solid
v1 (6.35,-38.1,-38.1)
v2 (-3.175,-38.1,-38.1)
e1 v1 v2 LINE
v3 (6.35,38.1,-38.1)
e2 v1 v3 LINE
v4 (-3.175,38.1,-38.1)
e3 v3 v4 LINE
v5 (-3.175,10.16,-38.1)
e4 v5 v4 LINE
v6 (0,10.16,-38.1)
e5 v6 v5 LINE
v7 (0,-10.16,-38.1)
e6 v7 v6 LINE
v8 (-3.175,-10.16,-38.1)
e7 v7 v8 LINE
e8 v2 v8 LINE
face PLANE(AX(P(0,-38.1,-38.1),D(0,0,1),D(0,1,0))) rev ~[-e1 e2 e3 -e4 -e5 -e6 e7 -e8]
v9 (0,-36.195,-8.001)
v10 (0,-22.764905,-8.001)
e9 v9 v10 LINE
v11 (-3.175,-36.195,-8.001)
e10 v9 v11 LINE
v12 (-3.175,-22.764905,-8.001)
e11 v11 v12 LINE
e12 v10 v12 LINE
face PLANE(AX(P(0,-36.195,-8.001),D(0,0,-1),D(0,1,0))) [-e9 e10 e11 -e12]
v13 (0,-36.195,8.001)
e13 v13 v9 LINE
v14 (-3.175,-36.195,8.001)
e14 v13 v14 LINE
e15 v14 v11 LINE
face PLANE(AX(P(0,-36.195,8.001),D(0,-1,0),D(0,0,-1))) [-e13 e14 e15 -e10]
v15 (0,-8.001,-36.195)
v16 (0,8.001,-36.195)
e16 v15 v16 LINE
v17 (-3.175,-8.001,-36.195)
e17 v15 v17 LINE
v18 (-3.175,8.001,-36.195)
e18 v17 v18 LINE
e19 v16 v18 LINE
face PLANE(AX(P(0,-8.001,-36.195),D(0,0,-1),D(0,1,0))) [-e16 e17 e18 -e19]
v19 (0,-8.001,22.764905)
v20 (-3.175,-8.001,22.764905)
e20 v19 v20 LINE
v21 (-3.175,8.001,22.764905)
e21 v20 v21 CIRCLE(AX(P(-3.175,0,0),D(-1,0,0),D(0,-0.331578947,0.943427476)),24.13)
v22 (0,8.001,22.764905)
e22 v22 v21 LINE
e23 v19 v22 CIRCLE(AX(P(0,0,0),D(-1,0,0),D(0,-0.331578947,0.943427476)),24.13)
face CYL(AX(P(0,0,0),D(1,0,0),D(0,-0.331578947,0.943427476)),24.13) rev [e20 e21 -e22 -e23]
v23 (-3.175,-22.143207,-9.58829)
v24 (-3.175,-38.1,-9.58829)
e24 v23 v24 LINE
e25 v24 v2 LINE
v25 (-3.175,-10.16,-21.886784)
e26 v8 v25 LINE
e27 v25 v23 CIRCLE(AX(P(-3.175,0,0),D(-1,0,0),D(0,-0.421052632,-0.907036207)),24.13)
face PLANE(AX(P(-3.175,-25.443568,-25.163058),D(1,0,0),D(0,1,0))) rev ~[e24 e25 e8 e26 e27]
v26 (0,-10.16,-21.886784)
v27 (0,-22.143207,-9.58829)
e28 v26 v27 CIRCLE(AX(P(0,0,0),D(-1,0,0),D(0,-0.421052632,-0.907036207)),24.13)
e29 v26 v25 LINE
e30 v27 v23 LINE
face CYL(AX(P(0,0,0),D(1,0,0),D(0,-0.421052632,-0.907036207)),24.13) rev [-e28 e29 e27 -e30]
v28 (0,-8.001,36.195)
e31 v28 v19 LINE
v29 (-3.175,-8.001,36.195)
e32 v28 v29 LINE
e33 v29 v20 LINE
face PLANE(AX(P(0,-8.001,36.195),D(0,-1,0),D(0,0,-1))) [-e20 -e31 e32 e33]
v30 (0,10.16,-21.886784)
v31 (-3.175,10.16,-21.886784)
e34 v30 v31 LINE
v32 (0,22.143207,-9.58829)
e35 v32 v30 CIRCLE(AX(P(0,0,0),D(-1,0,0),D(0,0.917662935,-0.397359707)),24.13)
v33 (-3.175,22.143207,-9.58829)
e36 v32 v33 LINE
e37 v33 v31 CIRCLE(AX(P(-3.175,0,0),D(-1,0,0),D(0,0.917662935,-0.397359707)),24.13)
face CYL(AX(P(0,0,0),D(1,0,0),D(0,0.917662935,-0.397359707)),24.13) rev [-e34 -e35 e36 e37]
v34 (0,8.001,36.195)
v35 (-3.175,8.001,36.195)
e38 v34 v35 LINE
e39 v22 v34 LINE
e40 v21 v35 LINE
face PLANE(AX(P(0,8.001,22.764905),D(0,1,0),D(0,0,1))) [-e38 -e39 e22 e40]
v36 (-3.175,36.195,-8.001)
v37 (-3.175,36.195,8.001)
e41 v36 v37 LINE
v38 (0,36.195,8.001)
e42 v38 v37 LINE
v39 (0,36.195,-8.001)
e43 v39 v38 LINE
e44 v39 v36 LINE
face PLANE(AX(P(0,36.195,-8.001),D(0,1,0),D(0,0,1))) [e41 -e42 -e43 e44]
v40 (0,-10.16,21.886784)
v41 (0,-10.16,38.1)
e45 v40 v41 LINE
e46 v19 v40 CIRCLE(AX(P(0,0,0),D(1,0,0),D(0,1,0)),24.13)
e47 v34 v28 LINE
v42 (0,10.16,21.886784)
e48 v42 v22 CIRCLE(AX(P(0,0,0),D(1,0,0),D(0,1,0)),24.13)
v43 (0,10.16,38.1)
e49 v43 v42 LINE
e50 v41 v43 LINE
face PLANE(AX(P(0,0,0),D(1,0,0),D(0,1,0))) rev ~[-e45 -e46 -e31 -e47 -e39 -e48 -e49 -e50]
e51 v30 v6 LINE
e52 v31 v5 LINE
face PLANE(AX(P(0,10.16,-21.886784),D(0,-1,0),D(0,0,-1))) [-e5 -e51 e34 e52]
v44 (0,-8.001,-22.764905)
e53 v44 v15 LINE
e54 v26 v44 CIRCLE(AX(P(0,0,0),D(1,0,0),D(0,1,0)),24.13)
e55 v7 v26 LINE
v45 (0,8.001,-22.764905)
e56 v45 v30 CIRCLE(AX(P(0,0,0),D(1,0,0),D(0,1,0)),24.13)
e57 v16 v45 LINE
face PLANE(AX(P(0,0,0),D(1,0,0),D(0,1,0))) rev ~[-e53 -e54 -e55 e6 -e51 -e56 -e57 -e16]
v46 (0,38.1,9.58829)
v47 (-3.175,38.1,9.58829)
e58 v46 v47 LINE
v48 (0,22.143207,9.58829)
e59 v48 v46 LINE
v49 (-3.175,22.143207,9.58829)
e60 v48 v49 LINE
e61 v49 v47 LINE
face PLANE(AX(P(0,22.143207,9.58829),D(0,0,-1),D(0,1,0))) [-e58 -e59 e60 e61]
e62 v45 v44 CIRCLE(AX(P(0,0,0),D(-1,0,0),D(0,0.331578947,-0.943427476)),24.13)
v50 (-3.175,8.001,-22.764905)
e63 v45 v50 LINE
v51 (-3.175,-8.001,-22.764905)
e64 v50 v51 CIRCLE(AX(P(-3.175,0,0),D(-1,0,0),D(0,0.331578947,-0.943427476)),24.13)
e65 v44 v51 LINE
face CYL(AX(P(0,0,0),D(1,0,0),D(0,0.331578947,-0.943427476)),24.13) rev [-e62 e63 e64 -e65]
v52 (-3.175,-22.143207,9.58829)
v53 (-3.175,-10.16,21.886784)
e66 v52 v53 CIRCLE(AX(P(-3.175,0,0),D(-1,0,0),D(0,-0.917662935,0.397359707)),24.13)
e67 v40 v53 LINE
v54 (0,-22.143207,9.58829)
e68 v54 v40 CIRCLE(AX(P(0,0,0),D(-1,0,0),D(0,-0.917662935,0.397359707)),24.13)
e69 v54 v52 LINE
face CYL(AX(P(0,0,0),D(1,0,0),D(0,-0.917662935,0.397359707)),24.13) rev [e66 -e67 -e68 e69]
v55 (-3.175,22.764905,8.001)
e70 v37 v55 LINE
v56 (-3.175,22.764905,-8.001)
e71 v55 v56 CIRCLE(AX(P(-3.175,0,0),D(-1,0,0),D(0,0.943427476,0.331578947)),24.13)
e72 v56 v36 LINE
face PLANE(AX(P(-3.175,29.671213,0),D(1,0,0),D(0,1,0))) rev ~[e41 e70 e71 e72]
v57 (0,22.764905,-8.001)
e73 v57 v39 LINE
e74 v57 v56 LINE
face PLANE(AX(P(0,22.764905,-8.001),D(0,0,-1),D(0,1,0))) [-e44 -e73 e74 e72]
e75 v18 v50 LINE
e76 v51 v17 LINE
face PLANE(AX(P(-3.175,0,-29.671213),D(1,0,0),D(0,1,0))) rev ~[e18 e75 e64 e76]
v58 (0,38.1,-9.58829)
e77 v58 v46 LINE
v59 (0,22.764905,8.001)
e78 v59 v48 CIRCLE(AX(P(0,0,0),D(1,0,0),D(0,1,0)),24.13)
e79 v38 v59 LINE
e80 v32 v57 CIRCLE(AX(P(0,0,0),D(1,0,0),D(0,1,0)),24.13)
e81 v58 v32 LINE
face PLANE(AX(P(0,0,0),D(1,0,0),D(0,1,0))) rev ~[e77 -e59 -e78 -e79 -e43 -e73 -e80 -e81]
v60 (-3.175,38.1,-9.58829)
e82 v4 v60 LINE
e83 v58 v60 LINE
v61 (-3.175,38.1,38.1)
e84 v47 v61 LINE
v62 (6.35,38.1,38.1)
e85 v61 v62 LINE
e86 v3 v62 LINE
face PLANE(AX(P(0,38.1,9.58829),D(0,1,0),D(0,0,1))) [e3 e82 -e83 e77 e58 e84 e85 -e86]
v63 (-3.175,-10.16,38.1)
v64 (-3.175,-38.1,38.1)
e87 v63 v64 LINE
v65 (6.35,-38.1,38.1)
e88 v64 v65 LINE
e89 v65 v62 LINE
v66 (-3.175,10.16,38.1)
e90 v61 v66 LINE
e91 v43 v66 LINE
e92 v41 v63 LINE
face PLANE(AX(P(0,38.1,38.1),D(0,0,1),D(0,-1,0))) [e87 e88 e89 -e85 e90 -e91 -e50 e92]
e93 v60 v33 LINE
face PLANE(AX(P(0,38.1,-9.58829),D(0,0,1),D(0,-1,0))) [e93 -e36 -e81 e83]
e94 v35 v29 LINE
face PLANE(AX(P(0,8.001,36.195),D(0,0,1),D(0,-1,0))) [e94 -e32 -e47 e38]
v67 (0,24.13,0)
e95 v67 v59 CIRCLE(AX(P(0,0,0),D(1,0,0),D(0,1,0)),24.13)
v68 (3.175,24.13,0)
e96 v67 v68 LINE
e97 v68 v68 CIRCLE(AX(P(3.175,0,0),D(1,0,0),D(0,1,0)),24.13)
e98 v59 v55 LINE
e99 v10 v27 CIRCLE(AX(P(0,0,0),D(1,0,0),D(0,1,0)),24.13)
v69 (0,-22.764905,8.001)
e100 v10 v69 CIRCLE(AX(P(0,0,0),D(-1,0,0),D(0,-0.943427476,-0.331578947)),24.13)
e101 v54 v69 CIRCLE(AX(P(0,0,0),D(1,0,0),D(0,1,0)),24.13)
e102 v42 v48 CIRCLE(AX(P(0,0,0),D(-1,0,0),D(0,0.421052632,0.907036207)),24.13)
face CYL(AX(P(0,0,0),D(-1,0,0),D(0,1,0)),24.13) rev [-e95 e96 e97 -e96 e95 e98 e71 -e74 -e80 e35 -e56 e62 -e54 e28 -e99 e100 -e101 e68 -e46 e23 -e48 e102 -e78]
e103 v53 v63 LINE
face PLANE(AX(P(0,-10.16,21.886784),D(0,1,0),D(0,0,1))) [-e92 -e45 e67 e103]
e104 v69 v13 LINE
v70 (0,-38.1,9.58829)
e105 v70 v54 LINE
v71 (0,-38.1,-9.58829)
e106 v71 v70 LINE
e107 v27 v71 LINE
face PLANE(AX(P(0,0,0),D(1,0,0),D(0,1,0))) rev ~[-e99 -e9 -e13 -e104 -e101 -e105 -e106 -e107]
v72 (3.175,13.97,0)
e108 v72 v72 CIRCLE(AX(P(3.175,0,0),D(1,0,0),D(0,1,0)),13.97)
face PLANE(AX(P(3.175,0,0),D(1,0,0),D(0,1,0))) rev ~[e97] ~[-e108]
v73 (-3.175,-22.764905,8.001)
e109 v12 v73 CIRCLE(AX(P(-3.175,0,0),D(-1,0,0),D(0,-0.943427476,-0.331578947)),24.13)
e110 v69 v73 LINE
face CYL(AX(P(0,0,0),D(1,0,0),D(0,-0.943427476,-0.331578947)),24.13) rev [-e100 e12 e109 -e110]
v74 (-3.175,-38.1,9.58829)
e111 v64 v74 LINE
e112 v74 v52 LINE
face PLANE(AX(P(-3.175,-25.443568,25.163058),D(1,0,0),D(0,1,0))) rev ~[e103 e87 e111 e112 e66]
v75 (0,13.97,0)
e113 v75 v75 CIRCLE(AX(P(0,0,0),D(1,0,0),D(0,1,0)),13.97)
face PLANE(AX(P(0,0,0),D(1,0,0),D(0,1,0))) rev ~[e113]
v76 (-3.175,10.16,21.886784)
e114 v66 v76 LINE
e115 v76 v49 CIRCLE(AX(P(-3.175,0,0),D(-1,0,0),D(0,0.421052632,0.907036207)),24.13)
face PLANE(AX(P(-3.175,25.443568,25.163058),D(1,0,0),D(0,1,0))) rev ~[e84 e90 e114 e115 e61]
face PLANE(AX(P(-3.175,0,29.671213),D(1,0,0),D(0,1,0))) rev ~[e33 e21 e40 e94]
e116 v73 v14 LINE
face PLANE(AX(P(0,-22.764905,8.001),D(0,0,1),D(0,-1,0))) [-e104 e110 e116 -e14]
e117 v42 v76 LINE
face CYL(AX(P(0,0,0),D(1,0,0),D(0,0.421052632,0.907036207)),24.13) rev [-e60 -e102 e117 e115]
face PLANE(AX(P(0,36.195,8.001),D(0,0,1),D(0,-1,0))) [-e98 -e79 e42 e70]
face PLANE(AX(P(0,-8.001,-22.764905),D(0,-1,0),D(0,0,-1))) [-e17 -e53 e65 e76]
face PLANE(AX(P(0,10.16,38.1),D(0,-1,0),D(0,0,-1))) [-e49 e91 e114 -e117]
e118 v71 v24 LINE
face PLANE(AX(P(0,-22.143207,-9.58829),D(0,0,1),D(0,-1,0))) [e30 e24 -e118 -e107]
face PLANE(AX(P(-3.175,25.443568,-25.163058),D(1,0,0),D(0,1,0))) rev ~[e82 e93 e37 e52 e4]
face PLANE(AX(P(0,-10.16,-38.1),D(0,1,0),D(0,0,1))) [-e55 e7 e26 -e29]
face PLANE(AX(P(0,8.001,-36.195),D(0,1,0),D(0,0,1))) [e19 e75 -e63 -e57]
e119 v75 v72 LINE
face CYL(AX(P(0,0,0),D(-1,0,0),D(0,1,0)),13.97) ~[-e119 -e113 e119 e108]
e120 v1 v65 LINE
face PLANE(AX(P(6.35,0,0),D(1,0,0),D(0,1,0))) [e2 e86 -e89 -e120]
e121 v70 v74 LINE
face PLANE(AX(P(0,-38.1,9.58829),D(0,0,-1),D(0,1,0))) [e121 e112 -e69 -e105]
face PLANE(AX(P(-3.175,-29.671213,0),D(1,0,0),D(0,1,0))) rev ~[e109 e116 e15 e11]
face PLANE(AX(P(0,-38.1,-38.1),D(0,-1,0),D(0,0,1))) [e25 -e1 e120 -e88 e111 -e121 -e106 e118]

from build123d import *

# Parameters (mm, degrees)
F0_W     = 76.2
F0_H     = 76.2
F0_R     = 24.13
F0_R_2   = 13.97
F1_DEPTH = 6.35
F3_DEPTH = 3.175
F5_DEPTH = 3.175


# Not quite as in the source:
# - after a boolean that leaves OpenCascade's solid faulty, fix() repairs it


with BuildPart() as f1:
    # F0 (on Right) → F1 (new body)
    with BuildSketch(Plane.YZ):
        Rectangle(F0_W, F0_H)
        Circle(F0_R, mode=Mode.SUBTRACT)
        Circle(F0_R)
        Circle(F0_R_2, mode=Mode.SUBTRACT)
        Circle(F0_R_2)
    extrude(amount=F1_DEPTH)

    # F0 (on Right) → F3 (cut)
    with BuildSketch(Plane.YZ):
        Circle(F0_R)
        Circle(F0_R_2, mode=Mode.SUBTRACT)
    extrude(amount=F3_DEPTH, mode=Mode.SUBTRACT)

    # F4 (on face) → F5 (join)
    with BuildSketch(Plane.YZ):
        with BuildLine():
            Line((38.1, 9.5882897328), (38.1, 38.1))
            Line((38.1, 38.1), (10.16, 38.1))
            Line((10.16, 38.1), (10.16, 21.8867836833))
            ThreePointArc((10.16, 21.8867836833), (17.2825787445, 16.8395181624), (22.1432066332, 9.5882897328))
            Line((22.1432066332, 9.5882897328), (38.1, 9.5882897328))
        make_face()
        with BuildLine():
            Line((38.1, -38.1), (38.1, -9.5882897328))
            Line((38.1, -9.5882897328), (22.1432066332, -9.5882897328))
            ThreePointArc((22.1432066332, -9.5882897328), (17.2825787445, -16.8395181624), (10.16, -21.8867836833))
            Line((10.16, -21.8867836833), (10.16, -38.1))
            Line((10.16, -38.1), (38.1, -38.1))
        make_face()
        with BuildLine():
            Line((-10.16, 21.8867836833), (-10.16, 38.1))
            Line((-10.16, 38.1), (-38.1, 38.1))
            Line((-38.1, 38.1), (-38.1, 9.5882897328))
            Line((-38.1, 9.5882897328), (-22.1432066332, 9.5882897328))
            ThreePointArc((-22.1432066332, 9.5882897328), (-17.2825787445, 16.8395181624), (-10.16, 21.8867836833))
        make_face()
        with BuildLine():
            Line((-38.1, -9.5882897328), (-38.1, -38.1))
            Line((-38.1, -38.1), (-10.16, -38.1))
            Line((-10.16, -38.1), (-10.16, -21.8867836833))
            ThreePointArc((-10.16, -21.8867836833), (-17.2825787445, -16.8395181624), (-22.1432066332, -9.5882897328))
            Line((-22.1432066332, -9.5882897328), (-38.1, -9.5882897328))
        make_face()
        with BuildLine():
            Line((36.195, -8.001), (36.195, 8.001))
            Line((36.195, 8.001), (22.7649049855, 8.001))
            ThreePointArc((22.7649049855, 8.001), (24.13, 0), (22.7649049855, -8.001))
            Line((22.7649049855, -8.001), (36.195, -8.001))
        make_face()
        with BuildLine():
            Line((-22.7649049855, 8.001), (-36.195, 8.001))
            Line((-36.195, 8.001), (-36.195, -8.001))
            Line((-36.195, -8.001), (-22.7649049855, -8.001))
            ThreePointArc((-22.7649049855, -8.001), (-24.13, 0), (-22.7649049855, 8.001))
        make_face()
        with BuildLine():
            Line((8.001, 22.7649049855), (8.001, 36.195))
            Line((8.001, 36.195), (-8.001, 36.195))
            Line((-8.001, 36.195), (-8.001, 22.7649049855))
            ThreePointArc((-8.001, 22.7649049855), (0, 24.13), (8.001, 22.7649049855))
        make_face()
        with BuildLine():
            Line((-8.001, -36.195), (8.001, -36.195))
            Line((8.001, -36.195), (8.001, -22.7649049855))
            ThreePointArc((8.001, -22.7649049855), (0, -24.13), (-8.001, -22.7649049855))
            Line((-8.001, -22.7649049855), (-8.001, -36.195))
        make_face()
    extrude(amount=-F5_DEPTH)

    add(f1.part.fix(), mode=Mode.REPLACE)


solid = f1.part
